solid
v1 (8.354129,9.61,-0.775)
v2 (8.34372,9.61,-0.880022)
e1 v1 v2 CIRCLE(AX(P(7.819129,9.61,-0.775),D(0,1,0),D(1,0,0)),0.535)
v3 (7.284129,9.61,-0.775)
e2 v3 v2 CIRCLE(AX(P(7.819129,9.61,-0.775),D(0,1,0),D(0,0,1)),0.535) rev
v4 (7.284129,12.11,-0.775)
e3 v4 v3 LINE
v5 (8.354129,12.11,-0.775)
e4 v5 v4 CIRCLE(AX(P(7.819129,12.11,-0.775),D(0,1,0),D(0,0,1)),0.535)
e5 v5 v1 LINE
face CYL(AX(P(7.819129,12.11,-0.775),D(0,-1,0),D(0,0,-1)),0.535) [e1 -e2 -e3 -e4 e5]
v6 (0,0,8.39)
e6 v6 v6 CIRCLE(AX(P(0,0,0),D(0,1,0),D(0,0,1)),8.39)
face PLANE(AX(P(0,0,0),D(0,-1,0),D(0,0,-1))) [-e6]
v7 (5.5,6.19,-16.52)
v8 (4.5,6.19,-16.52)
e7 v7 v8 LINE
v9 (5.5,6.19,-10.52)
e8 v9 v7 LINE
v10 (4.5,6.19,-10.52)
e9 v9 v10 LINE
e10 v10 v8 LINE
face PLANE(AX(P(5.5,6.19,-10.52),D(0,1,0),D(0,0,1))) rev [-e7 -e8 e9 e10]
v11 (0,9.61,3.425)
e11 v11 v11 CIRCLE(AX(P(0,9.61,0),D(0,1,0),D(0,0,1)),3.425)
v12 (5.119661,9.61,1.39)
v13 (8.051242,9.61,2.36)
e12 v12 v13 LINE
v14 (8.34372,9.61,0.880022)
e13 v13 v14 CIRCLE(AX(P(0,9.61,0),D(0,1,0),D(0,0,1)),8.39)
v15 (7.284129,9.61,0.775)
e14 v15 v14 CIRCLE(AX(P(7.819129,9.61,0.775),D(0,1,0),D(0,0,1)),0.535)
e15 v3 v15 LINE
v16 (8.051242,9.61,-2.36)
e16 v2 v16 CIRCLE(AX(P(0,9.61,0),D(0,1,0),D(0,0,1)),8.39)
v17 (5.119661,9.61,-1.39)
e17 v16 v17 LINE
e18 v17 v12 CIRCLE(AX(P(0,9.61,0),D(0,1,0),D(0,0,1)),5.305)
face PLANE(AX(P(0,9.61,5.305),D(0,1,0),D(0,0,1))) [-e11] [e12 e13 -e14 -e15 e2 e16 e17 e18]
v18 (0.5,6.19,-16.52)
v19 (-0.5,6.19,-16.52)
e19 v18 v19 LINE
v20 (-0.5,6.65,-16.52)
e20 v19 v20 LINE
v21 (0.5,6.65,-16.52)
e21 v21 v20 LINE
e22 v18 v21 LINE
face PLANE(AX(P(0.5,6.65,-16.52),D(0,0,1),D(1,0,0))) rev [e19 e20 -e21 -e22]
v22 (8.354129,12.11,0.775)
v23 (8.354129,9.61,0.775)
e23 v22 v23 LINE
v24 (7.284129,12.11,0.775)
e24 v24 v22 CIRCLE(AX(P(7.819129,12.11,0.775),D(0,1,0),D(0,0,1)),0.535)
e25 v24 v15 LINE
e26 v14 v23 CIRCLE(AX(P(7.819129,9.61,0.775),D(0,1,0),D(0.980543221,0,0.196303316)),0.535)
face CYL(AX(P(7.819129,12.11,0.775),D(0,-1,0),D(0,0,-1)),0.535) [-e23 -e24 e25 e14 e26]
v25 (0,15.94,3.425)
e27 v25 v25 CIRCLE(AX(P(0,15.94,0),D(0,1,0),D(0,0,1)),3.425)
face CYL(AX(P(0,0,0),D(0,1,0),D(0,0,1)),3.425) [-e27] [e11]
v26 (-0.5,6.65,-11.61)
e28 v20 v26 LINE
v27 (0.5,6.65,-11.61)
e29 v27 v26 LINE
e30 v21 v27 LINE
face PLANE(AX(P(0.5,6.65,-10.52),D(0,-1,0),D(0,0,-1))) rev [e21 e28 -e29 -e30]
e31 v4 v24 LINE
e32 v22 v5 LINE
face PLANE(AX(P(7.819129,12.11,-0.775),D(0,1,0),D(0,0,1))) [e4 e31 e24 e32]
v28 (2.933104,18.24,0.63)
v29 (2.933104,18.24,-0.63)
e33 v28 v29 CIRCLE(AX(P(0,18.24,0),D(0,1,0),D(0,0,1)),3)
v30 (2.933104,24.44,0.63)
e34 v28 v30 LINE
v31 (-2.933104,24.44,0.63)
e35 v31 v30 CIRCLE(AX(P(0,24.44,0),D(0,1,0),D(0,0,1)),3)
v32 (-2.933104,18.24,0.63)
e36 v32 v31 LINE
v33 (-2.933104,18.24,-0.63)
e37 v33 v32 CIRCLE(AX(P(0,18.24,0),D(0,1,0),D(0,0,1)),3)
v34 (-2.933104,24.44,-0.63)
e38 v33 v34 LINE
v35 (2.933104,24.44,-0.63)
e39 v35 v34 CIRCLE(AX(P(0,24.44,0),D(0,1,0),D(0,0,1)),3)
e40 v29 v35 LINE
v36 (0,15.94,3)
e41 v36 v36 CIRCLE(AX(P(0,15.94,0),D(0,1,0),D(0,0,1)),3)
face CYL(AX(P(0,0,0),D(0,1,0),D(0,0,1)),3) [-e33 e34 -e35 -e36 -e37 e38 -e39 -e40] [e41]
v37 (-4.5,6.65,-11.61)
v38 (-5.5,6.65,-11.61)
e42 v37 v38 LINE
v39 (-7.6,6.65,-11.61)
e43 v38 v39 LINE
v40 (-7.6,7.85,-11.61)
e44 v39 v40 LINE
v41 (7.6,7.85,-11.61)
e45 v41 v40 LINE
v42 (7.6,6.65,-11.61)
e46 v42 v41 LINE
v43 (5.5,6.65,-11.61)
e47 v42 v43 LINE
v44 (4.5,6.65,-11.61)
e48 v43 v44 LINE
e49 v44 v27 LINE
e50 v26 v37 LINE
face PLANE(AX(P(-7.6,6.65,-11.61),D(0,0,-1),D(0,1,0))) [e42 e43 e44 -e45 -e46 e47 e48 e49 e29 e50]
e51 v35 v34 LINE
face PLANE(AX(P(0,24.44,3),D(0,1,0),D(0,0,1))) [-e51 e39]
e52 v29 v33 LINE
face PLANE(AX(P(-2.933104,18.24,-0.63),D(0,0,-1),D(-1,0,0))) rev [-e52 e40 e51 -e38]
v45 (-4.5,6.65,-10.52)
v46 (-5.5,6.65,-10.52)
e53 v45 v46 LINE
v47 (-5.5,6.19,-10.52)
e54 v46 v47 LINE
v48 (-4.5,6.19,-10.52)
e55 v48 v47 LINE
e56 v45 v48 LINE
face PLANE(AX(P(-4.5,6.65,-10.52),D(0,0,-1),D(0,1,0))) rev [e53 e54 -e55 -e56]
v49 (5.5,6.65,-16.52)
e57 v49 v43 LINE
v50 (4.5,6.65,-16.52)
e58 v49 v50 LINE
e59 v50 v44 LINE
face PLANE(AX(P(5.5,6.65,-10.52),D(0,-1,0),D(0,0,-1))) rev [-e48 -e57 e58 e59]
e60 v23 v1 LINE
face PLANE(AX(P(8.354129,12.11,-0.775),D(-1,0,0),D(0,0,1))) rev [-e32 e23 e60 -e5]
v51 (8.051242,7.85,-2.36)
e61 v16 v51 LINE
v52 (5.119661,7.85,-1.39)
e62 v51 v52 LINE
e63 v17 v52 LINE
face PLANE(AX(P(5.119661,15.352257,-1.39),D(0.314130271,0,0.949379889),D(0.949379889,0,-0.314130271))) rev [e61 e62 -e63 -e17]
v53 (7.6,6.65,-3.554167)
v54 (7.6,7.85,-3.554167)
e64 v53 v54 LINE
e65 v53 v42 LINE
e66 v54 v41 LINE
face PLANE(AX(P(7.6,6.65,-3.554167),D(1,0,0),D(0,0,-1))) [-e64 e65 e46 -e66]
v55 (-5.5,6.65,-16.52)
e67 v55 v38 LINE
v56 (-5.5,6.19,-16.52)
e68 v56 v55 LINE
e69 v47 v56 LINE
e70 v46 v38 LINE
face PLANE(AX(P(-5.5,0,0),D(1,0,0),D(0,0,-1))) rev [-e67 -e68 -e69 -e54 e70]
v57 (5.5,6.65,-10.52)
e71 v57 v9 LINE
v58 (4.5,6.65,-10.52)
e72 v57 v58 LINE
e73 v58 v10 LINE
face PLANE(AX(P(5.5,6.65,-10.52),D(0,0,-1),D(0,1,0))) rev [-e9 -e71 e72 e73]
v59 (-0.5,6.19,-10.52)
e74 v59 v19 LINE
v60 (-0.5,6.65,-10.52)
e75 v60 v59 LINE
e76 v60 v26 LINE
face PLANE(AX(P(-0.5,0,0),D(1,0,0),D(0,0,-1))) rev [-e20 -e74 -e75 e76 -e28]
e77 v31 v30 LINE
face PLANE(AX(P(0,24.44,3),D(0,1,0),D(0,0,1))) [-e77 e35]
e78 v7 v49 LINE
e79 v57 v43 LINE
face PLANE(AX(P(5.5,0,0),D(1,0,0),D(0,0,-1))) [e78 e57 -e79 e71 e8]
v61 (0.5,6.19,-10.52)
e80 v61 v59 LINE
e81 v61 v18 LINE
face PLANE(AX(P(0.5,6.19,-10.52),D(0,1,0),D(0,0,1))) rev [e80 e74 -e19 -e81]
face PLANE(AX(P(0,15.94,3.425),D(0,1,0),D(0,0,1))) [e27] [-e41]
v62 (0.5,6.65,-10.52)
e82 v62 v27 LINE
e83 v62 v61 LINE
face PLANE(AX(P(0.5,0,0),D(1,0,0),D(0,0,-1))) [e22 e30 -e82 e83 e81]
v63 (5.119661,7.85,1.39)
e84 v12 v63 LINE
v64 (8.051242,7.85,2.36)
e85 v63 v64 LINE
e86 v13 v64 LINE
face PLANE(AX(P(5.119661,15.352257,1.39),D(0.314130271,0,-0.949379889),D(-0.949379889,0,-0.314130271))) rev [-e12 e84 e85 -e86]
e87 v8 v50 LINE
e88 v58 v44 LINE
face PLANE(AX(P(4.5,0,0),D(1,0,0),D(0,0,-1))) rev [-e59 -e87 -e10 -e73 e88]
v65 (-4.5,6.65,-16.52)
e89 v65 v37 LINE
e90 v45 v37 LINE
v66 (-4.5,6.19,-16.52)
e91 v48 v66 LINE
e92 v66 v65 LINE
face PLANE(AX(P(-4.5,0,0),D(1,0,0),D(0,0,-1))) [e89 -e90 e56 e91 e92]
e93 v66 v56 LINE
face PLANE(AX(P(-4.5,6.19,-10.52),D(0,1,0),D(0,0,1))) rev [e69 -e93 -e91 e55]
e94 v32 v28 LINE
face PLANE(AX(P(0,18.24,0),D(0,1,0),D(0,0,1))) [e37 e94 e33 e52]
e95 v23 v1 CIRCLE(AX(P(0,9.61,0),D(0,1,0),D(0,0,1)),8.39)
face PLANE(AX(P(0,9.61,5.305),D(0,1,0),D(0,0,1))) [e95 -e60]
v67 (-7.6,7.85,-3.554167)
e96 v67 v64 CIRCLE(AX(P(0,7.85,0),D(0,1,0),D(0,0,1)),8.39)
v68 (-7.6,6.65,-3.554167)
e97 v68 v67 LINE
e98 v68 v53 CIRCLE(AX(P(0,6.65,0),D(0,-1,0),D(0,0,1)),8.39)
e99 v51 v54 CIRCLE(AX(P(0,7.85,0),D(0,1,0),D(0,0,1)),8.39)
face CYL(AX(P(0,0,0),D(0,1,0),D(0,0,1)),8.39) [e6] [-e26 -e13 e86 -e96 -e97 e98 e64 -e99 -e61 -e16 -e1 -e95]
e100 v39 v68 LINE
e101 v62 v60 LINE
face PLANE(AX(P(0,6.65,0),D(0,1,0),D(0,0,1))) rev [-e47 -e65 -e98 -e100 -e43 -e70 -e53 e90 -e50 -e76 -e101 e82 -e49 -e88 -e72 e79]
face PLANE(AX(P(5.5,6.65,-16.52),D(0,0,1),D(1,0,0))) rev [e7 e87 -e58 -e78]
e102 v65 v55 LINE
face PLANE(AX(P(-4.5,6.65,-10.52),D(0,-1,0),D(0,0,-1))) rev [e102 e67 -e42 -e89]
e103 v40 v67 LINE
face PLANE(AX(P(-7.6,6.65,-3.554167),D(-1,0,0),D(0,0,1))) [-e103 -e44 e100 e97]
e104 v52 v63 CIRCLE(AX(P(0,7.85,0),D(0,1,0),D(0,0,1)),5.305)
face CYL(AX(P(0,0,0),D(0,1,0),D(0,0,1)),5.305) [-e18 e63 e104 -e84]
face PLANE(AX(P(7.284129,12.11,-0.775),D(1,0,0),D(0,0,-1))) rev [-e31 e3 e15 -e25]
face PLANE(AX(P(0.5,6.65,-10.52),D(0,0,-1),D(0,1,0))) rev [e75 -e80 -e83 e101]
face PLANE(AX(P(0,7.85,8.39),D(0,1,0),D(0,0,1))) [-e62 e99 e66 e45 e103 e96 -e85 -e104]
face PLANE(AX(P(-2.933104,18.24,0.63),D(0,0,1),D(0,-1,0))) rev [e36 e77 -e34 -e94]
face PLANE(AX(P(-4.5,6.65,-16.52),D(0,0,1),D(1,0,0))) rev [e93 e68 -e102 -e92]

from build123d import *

# Parameters (mm, degrees)
CUT_EXTRUDE1_DEPTH  = 6.2
BOSS_EXTRUDE1_DEPTH = 1.2
SKETCH5_W           = 6
SKETCH5_H           = 0.46
BOSS_EXTRUDE2_DEPTH = 0.5
LPATTERN1_COUNT     = 2
LPATTERN1_PITCH     = 5
LPATTERN1_COL_COUNT = 2
LPATTERN1_COL_PITCH = 5
BOSS_EXTRUDE3_START = 1.76
BOSS_EXTRUDE3_DEPTH = 1.76
BOSS_EXTRUDE4_DEPTH = 2.5


# Read off the part's stored shape, not the designer's step: Boss-Extrude4
with BuildPart() as part:
    # Sketch1 → Revolve1 (revolve)
    with BuildSketch(Plane(origin=(0, 0, 0), x_dir=(0, 0, -1), z_dir=(1, 0, 0))):
        Polygon((0, 0), (-8.39, 0), (-8.39, 7.85), (-5.305, 7.85), (-5.305, 9.61), (-3.425, 9.61), (-3.425, 15.94), (-3, 15.94), (-3, 24.44), (0, 24.44), align=None)
    revolve(axis=Axis((0, 0, 0), (0, -1, 0)))

    # Sketch3 → Cut-Extrude1 (cut)
    with BuildSketch(Plane(origin=(0, 24.44, 0), x_dir=(1, 0, 0), z_dir=(0, 1, 0))):
        with BuildLine():
            Line((-2.933104158, -0.63), (2.933104158, -0.63))
            ThreePointArc((2.933104158, -0.63), (3, 0), (2.933104158, 0.63))
            Line((2.933104158, 0.63), (-2.933104158, 0.63))
            ThreePointArc((-2.933104158, 0.63), (-3, 0), (-2.933104158, -0.63))
        make_face()
    extrude(amount=-CUT_EXTRUDE1_DEPTH, mode=Mode.SUBTRACT)

    # Sketch4 → Boss-Extrude1 (add)
    with BuildSketch(Plane(origin=(0, 7.85, 0), x_dir=(1, 0, 0), z_dir=(0, 1, 0))):
        with BuildLine():
            Line((-7.6, 3.554166569), (-7.6, 11.61))
            Line((-7.6, 11.61), (7.6, 11.61))
            Line((7.6, 11.61), (7.6, 3.554166569))
            ThreePointArc((7.6, 3.554166569), (0, 8.39), (-7.6, 3.554166569))
        make_face()
    extrude(amount=-BOSS_EXTRUDE1_DEPTH)

    # Sketch5 → Boss-Extrude2 (add, symmetric)
    with BuildSketch(Plane(origin=(0, 0, 0), x_dir=(0, 0, -1), z_dir=(1, 0, 0))):
        with Locations((13.52, 6.42)):
            Rectangle(SKETCH5_W, SKETCH5_H)
    boss_extrude2 = extrude(amount=BOSS_EXTRUDE2_DEPTH, both=True)

    # LPattern1: Boss-Extrude2 ×2
    with Locations(*[(i * LPATTERN1_PITCH, 0, 0) for i in range(1, LPATTERN1_COUNT)]):
        add(boss_extrude2)

    # LPattern1 col: Boss-Extrude2 ×2
    with Locations(*[(-i * LPATTERN1_COL_PITCH, 0, 0) for i in range(1, LPATTERN1_COL_COUNT)]):
        add(boss_extrude2)

    # Sketch6 → Boss-Extrude3 (add)
    with BuildSketch(Plane(origin=(0, 7.85, 0), x_dir=(1, 0, 0), z_dir=(0, 1, 0)).offset(BOSS_EXTRUDE3_START)):
        with BuildLine():
            Line((5.119660633, 1.39), (8.05124214, 2.36))
            ThreePointArc((8.05124214, 2.36), (8.39, 0), (8.05124214, -2.36))
            Line((8.05124214, -2.36), (5.119660633, -1.39))
            ThreePointArc((5.119660633, -1.39), (5.305, 0), (5.119660633, 1.39))
        make_face()
    extrude(amount=-BOSS_EXTRUDE3_DEPTH)

    # Boss-Extrude4 outline → Boss-Extrude4 (add)
    with BuildSketch(Plane(origin=(0, 9.61, 0), x_dir=(1, 0, 0), z_dir=(0, 1, 0))):
        with BuildLine():
            ThreePointArc((8.354129219, 0.775), (7.819129219, 1.31), (7.284129219, 0.775))
            Line((7.284129219, 0.775), (7.284129219, -0.775))
            ThreePointArc((7.284129219, -0.775), (7.819129219, -1.31), (8.354129219, -0.775))
            Line((8.354129219, -0.775), (8.354129219, 0.775))
        make_face()
    extrude(amount=BOSS_EXTRUDE4_DEPTH)


solid = part.part
